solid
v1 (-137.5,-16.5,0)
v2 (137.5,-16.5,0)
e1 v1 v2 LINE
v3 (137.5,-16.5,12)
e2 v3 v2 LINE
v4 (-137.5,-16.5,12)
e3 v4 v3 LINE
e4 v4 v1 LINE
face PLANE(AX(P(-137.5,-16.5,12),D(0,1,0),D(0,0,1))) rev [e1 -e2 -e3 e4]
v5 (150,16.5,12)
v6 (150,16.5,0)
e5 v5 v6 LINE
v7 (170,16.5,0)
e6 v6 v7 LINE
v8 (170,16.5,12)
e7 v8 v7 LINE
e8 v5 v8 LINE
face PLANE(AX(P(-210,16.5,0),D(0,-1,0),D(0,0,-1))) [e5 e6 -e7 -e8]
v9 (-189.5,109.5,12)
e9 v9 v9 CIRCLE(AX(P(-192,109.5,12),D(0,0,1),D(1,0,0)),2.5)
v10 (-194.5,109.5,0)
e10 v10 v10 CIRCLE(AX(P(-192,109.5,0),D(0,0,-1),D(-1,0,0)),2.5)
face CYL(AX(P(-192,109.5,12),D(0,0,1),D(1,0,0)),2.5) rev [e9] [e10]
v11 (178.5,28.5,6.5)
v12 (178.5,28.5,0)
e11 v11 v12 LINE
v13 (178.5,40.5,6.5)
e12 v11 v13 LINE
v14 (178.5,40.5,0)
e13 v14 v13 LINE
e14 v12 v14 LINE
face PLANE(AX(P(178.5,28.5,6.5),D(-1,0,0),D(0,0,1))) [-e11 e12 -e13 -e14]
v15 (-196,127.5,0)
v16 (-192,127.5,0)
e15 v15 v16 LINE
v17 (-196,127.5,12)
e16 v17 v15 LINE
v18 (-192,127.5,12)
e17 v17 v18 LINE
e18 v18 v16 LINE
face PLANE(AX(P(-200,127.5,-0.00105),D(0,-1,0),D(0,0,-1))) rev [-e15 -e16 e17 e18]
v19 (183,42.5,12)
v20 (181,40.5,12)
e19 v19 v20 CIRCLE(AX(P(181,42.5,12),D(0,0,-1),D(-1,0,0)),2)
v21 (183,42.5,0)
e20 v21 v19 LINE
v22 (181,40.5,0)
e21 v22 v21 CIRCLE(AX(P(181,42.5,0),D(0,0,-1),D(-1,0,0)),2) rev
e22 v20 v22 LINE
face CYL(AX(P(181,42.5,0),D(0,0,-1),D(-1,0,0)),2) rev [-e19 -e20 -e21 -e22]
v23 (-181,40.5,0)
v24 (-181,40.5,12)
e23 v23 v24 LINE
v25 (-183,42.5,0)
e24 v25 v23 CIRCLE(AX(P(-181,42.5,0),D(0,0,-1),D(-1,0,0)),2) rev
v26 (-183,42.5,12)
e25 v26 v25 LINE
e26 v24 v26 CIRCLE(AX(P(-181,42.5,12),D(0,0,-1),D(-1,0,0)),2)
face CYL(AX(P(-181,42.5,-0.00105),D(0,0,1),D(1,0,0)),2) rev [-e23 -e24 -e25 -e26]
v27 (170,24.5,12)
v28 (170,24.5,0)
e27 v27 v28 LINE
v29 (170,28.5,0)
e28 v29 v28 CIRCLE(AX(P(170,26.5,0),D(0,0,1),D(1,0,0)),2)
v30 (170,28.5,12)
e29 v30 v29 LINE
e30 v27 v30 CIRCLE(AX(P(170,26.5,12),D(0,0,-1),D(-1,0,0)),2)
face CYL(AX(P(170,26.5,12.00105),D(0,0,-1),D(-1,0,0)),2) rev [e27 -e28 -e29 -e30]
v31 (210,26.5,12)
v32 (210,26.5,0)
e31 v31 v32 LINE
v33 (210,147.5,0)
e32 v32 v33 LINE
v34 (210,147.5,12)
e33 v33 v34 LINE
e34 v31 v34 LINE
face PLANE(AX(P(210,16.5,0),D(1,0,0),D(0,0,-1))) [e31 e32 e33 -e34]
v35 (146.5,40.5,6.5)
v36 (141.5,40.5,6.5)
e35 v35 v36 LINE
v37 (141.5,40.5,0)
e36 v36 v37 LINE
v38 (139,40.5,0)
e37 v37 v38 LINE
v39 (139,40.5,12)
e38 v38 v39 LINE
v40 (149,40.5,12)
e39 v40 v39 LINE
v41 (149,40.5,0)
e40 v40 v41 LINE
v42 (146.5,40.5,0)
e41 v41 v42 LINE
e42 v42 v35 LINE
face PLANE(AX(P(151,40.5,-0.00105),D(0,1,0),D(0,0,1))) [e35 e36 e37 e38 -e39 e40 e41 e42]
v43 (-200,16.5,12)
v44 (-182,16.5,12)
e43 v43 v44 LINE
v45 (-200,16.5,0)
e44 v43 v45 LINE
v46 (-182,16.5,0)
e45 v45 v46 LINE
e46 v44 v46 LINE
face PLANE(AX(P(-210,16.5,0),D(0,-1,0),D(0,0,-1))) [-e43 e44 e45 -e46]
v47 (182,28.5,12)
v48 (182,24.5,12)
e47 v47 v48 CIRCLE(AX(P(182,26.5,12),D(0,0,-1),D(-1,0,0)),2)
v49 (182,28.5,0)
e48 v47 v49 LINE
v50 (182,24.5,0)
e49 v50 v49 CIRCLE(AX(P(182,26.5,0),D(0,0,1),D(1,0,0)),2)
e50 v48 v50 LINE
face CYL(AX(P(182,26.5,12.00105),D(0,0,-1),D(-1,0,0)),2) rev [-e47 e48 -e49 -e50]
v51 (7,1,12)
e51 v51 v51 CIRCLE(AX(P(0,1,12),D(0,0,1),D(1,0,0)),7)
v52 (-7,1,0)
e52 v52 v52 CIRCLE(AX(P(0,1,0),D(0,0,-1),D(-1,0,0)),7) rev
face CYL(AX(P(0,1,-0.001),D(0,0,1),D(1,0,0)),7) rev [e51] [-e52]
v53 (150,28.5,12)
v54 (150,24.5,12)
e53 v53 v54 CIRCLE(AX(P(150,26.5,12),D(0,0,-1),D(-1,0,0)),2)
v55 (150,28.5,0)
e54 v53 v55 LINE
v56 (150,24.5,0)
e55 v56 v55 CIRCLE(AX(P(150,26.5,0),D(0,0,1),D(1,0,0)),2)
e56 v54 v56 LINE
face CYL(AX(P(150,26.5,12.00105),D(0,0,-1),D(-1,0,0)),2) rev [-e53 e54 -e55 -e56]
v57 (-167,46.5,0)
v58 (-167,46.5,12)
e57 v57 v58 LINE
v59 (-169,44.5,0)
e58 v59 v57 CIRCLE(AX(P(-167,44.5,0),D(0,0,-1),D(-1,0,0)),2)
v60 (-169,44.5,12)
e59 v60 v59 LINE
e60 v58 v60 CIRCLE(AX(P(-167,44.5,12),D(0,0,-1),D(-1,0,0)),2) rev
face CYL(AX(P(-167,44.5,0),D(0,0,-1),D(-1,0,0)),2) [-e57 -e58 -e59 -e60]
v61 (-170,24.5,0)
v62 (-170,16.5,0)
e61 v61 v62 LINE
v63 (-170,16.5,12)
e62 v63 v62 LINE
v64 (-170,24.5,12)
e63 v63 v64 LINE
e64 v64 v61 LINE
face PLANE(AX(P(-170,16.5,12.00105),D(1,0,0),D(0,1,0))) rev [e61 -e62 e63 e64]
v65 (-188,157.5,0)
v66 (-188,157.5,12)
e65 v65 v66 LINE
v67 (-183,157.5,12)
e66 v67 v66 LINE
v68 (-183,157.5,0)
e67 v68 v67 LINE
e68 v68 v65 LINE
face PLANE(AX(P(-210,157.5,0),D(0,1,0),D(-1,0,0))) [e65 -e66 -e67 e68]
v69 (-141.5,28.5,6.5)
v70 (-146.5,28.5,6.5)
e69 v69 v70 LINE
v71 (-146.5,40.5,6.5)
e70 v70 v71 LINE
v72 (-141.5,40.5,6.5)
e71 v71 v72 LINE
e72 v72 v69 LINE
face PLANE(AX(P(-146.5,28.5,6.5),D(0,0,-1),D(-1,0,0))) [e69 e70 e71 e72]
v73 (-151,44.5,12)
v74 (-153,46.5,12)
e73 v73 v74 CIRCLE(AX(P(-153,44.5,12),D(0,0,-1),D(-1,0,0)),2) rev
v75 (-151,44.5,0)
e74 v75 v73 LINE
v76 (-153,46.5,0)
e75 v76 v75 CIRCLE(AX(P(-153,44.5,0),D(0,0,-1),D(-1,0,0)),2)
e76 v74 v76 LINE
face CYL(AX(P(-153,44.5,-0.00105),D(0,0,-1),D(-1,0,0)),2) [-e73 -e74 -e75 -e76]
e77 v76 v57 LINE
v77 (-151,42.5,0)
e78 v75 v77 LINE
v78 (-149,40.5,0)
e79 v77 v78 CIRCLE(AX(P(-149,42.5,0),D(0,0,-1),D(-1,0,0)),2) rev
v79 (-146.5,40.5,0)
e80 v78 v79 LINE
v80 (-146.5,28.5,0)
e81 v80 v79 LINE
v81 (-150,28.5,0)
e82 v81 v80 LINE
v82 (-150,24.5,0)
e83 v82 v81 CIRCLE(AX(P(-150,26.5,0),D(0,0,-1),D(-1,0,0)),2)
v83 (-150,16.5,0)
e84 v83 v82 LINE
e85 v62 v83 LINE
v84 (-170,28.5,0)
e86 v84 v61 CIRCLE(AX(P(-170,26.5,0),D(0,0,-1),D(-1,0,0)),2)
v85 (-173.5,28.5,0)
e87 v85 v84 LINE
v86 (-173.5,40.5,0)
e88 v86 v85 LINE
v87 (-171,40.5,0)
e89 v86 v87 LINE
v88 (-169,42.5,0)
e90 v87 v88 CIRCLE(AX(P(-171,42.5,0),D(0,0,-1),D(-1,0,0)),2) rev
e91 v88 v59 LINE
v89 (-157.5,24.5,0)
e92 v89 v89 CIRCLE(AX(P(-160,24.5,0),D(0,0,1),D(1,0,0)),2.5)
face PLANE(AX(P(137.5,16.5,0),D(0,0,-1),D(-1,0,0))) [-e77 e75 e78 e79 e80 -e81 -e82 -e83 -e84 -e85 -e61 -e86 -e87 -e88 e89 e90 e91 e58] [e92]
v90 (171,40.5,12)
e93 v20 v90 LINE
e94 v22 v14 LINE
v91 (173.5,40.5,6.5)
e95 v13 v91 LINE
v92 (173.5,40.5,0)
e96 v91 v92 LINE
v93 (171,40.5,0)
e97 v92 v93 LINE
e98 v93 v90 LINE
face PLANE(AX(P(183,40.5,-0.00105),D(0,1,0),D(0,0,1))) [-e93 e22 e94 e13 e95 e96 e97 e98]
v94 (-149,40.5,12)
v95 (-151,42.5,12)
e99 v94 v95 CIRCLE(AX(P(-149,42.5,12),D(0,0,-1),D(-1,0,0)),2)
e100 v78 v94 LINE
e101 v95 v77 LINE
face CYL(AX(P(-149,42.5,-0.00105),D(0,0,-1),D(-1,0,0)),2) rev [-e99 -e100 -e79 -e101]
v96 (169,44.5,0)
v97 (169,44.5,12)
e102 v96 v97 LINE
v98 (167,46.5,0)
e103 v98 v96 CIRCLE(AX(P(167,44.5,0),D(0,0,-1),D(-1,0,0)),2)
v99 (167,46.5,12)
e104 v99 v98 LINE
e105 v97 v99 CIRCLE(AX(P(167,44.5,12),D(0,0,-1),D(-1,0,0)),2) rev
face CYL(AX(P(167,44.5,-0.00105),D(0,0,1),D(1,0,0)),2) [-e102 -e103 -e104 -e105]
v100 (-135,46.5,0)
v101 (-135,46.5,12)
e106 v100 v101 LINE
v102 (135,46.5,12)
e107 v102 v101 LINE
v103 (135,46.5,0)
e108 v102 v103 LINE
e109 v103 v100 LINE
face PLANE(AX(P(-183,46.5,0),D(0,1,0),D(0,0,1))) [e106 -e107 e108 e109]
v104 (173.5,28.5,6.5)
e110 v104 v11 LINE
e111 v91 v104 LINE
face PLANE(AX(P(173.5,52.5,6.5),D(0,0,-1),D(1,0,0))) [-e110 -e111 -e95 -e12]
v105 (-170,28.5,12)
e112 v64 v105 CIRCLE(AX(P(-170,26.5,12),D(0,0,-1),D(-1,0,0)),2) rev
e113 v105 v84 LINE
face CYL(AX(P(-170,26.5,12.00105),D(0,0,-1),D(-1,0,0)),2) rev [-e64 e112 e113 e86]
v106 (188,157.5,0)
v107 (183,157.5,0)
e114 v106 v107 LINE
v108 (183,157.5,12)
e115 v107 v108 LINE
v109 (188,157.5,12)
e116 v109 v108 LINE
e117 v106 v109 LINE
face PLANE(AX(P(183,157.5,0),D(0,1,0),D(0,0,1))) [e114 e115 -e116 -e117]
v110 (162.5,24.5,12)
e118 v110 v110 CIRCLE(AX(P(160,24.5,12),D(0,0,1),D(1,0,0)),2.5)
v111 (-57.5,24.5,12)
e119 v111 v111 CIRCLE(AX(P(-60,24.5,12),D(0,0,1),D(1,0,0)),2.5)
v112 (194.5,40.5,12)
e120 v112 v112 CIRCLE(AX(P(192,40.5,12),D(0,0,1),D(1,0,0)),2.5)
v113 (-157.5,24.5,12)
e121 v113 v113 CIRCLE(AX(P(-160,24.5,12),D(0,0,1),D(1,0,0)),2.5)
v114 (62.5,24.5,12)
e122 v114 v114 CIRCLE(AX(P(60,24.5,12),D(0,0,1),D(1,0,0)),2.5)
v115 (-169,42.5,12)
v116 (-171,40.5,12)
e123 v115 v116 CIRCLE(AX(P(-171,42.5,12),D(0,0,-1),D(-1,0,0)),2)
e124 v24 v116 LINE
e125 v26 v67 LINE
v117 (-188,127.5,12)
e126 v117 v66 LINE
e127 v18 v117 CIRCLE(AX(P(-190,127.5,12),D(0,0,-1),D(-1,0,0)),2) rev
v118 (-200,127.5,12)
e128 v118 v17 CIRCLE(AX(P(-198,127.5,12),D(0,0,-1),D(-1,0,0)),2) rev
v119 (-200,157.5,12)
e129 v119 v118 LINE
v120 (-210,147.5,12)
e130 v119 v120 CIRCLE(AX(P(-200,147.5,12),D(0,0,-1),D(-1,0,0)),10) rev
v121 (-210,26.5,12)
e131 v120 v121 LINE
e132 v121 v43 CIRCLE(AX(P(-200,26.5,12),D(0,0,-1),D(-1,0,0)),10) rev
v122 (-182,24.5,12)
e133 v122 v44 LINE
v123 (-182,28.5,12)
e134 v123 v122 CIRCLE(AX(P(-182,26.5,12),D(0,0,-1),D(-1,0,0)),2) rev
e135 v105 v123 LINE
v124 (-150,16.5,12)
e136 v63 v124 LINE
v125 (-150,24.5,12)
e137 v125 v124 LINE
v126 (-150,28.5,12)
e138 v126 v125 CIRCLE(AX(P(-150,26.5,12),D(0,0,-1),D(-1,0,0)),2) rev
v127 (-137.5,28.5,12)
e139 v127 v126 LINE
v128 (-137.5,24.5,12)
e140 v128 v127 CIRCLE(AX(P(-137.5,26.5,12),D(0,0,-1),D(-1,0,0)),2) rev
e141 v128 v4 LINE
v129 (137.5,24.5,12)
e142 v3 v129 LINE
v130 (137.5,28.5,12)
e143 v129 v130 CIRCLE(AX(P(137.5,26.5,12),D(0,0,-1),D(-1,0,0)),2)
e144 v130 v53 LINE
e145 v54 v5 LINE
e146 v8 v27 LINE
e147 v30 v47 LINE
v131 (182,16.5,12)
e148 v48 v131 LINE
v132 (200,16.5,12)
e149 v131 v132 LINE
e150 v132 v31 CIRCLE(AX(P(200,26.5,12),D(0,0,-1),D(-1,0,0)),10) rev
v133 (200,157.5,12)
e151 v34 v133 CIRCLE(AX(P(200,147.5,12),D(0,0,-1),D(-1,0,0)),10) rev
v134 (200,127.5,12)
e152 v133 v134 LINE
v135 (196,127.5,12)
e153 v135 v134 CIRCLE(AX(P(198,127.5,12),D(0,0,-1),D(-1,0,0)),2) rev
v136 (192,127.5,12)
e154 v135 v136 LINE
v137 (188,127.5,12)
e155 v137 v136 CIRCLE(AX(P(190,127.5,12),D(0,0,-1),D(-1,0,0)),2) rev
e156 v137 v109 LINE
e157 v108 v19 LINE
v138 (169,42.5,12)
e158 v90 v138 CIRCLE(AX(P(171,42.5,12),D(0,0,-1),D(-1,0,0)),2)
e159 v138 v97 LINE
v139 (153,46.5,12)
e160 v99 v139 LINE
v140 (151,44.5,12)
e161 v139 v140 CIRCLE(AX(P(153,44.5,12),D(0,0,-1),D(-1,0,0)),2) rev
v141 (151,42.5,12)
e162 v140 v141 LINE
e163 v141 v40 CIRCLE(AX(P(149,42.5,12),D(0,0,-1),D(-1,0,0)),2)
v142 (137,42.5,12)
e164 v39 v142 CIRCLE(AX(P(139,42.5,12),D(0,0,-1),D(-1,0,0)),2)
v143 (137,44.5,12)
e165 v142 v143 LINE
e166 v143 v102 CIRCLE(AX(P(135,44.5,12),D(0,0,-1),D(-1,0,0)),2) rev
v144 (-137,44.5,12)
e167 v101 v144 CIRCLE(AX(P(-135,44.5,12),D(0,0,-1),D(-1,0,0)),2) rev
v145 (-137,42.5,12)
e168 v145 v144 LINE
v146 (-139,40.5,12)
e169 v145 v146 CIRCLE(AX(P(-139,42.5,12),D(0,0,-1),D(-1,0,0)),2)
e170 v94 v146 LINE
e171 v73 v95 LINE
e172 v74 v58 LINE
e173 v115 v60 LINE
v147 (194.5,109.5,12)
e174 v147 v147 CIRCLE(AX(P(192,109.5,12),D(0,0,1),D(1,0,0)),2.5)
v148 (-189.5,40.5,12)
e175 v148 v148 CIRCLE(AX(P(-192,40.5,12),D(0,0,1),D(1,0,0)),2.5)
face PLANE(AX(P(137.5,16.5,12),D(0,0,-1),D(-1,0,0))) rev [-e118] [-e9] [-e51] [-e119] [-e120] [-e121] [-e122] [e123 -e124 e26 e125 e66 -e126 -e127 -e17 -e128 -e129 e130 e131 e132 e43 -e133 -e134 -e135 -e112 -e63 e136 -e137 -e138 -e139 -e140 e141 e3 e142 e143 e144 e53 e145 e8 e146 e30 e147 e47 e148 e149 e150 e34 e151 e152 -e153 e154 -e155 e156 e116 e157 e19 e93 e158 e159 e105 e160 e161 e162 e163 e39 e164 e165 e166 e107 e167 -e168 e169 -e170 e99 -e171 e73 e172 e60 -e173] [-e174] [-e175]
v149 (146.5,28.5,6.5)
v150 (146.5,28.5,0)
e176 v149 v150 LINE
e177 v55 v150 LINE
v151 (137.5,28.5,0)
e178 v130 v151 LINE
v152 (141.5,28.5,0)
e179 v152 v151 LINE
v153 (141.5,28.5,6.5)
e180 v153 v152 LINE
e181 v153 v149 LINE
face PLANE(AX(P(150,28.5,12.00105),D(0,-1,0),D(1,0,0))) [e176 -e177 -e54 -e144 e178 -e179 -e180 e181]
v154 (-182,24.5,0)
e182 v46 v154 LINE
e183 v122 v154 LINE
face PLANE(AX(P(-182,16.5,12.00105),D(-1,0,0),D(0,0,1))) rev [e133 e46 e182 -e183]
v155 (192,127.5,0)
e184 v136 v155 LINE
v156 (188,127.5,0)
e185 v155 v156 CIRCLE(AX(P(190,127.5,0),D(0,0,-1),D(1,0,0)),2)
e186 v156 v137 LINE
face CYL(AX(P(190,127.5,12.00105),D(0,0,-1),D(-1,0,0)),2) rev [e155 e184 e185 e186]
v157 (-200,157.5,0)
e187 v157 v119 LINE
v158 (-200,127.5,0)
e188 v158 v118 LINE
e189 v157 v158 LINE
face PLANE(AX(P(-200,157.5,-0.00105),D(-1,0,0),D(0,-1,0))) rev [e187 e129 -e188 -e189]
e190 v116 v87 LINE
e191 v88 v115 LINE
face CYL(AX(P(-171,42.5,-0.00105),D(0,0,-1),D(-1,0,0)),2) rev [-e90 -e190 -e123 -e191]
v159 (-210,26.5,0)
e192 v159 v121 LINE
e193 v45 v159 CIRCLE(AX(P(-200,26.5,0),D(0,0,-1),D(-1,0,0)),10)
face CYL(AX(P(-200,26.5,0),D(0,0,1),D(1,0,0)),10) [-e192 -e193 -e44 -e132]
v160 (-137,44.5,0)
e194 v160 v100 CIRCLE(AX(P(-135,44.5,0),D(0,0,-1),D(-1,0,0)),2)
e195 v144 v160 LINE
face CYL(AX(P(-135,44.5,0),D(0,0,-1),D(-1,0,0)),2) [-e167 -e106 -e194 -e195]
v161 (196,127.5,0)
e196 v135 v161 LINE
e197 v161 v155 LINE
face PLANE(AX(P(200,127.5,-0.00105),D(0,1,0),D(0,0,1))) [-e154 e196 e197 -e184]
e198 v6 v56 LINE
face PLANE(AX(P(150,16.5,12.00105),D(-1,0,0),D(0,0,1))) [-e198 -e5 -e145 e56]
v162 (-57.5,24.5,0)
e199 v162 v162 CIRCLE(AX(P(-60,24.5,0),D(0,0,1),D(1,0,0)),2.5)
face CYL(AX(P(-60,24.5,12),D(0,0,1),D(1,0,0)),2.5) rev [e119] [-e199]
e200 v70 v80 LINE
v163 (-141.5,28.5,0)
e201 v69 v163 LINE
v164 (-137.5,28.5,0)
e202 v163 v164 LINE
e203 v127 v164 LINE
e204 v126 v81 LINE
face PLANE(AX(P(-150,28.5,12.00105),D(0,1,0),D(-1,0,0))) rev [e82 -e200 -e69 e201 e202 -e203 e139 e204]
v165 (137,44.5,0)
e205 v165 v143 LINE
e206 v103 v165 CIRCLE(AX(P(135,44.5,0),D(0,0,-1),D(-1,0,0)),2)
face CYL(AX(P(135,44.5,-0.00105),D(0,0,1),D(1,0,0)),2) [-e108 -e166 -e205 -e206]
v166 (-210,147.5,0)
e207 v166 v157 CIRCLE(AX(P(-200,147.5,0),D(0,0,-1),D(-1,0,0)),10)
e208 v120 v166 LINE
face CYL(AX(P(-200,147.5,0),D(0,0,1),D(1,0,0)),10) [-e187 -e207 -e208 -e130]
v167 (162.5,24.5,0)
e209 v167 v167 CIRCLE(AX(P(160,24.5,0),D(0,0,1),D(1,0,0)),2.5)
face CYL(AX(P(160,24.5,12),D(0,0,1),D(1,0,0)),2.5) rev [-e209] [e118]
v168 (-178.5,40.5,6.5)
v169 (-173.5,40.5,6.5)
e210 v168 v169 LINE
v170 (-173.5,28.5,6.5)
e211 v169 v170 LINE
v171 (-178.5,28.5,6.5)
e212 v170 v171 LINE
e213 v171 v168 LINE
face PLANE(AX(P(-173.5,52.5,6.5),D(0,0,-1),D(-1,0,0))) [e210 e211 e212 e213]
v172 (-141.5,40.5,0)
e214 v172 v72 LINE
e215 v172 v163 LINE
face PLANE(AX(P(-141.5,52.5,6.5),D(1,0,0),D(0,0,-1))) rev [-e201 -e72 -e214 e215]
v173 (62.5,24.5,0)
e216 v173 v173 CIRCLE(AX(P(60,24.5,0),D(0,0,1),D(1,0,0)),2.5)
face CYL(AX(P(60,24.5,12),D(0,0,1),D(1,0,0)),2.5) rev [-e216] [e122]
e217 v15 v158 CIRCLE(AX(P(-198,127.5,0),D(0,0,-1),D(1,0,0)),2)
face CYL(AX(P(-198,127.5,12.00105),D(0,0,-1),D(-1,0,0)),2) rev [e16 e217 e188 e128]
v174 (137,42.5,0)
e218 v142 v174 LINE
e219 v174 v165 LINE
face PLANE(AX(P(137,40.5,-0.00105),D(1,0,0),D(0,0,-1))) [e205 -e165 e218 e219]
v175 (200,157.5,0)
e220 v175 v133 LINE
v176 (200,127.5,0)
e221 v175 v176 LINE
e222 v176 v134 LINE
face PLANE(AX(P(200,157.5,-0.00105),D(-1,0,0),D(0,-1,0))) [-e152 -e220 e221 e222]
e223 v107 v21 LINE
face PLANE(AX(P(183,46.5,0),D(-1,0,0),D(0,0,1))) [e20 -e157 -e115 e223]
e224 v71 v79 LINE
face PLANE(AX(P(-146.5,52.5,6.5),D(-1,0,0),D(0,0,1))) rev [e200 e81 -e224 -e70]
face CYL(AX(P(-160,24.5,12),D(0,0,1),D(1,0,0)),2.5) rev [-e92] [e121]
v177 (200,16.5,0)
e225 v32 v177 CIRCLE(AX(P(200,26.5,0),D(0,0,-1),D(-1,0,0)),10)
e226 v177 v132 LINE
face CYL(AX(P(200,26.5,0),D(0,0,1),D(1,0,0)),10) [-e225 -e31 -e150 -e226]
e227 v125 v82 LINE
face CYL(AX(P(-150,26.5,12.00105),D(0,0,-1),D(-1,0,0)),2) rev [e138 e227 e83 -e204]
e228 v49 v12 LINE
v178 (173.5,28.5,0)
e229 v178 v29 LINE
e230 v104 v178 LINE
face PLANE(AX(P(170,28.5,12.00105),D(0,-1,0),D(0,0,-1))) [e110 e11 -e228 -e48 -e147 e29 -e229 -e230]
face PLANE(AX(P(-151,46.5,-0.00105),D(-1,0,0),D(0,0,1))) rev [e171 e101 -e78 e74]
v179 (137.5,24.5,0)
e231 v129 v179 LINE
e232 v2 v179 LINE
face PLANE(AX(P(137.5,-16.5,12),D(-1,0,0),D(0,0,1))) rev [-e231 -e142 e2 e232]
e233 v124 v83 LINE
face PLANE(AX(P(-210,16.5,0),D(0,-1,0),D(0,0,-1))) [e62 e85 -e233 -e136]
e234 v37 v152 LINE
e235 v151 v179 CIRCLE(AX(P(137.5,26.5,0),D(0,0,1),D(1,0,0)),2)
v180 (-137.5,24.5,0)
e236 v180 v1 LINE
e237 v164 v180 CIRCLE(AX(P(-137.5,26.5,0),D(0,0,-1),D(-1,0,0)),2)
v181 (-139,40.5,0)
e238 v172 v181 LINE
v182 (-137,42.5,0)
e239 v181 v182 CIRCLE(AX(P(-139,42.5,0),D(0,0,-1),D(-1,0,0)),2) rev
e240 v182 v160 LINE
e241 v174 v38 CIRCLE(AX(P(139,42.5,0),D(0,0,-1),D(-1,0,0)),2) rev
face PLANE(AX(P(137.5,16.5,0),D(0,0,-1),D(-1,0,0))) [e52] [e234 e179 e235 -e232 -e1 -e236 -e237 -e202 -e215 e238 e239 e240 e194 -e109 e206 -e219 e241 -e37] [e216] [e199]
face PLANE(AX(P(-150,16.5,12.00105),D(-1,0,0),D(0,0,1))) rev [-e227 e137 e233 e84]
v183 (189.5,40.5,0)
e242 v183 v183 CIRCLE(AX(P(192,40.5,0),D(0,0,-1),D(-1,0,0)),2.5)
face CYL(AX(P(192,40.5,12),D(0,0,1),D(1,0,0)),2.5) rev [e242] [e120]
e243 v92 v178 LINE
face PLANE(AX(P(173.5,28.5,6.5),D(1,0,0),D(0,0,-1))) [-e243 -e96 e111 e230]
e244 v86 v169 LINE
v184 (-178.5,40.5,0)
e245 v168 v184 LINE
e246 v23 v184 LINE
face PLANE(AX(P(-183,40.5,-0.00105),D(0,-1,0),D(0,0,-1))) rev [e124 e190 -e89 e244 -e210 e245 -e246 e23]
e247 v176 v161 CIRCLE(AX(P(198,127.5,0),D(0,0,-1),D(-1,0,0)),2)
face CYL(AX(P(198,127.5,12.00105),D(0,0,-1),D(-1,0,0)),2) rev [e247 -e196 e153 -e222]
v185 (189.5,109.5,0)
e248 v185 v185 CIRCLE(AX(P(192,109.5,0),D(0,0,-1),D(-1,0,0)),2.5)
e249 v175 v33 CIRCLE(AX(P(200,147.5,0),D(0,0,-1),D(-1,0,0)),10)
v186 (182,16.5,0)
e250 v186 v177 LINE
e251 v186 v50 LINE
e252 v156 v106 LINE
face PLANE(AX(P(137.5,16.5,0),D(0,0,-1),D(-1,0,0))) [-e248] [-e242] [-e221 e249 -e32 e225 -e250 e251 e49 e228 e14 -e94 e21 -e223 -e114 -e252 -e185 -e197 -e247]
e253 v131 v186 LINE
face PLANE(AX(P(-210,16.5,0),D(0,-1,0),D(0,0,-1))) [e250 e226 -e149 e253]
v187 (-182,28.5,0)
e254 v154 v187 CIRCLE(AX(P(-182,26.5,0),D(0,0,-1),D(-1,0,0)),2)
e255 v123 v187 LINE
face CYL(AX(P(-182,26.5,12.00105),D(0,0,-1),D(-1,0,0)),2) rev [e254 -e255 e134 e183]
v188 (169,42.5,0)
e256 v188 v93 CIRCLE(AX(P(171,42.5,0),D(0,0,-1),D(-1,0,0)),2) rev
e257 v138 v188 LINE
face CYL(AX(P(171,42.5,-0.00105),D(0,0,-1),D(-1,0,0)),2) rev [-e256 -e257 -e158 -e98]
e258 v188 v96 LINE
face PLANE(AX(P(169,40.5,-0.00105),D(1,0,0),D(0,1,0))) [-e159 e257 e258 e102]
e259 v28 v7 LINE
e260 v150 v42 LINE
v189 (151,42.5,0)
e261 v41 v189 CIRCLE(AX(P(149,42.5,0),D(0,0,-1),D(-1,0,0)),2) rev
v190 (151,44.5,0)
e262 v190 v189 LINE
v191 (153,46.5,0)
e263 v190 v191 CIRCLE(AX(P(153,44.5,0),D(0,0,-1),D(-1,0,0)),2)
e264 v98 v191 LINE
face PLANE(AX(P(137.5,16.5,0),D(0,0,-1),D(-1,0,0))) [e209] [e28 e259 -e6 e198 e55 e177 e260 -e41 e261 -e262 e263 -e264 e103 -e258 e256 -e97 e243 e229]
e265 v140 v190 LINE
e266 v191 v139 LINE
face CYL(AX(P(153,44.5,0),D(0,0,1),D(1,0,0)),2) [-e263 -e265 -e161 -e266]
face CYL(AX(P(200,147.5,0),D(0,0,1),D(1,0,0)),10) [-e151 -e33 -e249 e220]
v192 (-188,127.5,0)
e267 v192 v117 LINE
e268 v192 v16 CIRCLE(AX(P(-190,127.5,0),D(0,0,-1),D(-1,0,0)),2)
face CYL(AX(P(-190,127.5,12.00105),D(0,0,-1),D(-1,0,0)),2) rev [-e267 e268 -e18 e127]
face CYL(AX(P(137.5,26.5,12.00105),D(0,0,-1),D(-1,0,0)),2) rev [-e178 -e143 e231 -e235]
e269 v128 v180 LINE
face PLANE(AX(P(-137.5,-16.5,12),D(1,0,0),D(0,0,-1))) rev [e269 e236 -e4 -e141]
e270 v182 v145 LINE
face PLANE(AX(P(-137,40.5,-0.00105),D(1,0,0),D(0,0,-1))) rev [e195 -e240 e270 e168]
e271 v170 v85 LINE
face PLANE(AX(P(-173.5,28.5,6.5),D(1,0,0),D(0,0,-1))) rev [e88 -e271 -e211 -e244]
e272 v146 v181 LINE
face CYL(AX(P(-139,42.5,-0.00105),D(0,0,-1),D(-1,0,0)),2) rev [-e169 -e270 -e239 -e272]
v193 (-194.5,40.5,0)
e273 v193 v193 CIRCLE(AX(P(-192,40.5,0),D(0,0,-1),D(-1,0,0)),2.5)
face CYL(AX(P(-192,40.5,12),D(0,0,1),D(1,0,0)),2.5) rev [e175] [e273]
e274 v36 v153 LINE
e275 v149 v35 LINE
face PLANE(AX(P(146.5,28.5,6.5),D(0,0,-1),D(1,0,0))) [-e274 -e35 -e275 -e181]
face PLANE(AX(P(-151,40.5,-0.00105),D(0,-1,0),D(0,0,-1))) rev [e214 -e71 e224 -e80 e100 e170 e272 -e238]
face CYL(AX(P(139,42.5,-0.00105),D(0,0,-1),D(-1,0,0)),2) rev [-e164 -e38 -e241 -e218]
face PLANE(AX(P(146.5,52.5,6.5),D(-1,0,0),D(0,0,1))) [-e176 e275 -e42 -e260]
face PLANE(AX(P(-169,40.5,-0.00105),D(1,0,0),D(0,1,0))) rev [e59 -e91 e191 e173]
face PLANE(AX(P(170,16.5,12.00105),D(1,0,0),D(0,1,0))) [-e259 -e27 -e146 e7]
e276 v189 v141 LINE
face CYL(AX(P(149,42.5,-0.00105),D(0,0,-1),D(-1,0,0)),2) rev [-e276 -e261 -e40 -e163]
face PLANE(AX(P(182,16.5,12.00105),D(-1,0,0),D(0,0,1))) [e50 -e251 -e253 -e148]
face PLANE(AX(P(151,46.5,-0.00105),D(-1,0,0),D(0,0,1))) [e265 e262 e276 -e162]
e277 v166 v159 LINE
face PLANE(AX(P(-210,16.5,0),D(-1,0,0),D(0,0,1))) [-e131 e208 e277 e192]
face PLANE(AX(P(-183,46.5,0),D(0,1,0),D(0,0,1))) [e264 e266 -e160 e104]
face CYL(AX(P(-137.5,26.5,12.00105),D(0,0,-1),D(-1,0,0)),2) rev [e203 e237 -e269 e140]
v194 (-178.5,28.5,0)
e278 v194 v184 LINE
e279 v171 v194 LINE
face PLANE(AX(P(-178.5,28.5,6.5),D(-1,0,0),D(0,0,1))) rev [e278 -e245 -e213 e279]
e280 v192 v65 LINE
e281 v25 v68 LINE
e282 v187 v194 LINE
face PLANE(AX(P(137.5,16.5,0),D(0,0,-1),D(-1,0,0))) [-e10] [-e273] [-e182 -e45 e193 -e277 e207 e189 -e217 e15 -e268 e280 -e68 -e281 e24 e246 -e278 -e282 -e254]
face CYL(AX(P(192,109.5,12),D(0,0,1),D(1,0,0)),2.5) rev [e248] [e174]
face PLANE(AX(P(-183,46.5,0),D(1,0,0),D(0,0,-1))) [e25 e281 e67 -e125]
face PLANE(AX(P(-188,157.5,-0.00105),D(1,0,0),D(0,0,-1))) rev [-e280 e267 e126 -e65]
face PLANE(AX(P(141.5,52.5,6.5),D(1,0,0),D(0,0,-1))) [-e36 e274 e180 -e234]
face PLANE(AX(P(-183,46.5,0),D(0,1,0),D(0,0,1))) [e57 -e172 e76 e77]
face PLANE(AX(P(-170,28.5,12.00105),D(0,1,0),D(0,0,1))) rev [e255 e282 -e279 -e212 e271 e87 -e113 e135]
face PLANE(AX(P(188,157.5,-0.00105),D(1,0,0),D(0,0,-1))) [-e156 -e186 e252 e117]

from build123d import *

# Parameters (mm, degrees)
SKETCH1_W                    = 275
SKETCH1_H                    = 33
BOSS_EXTRUDE1_DEPTH          = 12
CUT_EXTRUDE1_REACH           = 141.005
SKETCH2_R                    = 7
BOSS_EXTRUDE2_DEPTH          = 12
CUT_EXTRUDE3_REACH           = 264.774
SKETCH5_W                    = 14
SKETCH5_H                    = 6
FILLET1_R                    = 2
SKETCH17_W                   = 5
SKETCH17_H                   = 24
CUT_EXTRUDE9_DEPTH           = 6.5
CUT_EXTRUDE4_REACH           = 264.774
SKETCH6_W                    = 12
SKETCH6_H                    = 30
F_5_0_5_DIAMETER_HOLE2_D     = 5
F_5_0_5_DIAMETER_HOLE1_D     = 5
F_5_0_5_DIAMETER_HOLE1_DEPTH = 12
F_5_0_5_DIAMETER_HOLE1_TIP   = 1.502151548
FILLET2_R                    = 10
CUT_EXTRUDE5_REACH           = 264.774
CUT_EXTRUDE10_REACH          = 264.774
FILLET1_OF_MIRROR2_R         = 2


with BuildPart() as part:
    # Sketch1 → Boss-Extrude1 (new body)
    with BuildSketch(Plane.XY):
        Rectangle(SKETCH1_W, SKETCH1_H)
    extrude(amount=BOSS_EXTRUDE1_DEPTH)

    # Sketch2 → Cut-Extrude1 (cut, up to next)
    with BuildSketch(Plane.XY.offset(12), mode=Mode.PRIVATE) as cut_extrude1_sk1:
        with Locations((0, 1)):
            Circle(SKETCH2_R)
    cut_extrude1_tool1 = extrude(cut_extrude1_sk1.sketch, amount=-CUT_EXTRUDE1_REACH, mode=Mode.PRIVATE) & part.part
    add(cut_extrude1_tool1.solids().sort_by_distance((0, 1, 12))[0], mode=Mode.SUBTRACT)

    # Sketch3 → Boss-Extrude2 (add)
    with BuildSketch(Plane.XY.offset(12)):
        Polygon((-210, 16.5), (210, 16.5), (210, 157.5), (183, 157.5), (183, 46.5), (-183, 46.5), (-183, 157.5), (-210, 157.5), align=None)
    extrude(amount=-BOSS_EXTRUDE2_DEPTH)

    # Sketch5 → Cut-Extrude3 (cut, up to next)
    with BuildSketch(Plane.XY.offset(12), mode=Mode.PRIVATE) as cut_extrude3_sk1:
        with Locations((-176, 43.5)):
            Rectangle(SKETCH5_W, SKETCH5_H)
    cut_extrude3_tool1 = extrude(cut_extrude3_sk1.sketch, amount=-CUT_EXTRUDE3_REACH, mode=Mode.PRIVATE) & part.part
    # Sketch5 → Cut-Extrude3 (cut, up to next)
    with BuildSketch(Plane.XY.offset(12), mode=Mode.PRIVATE) as cut_extrude3_sk2:
        with Locations((-144, 43.5)):
            Rectangle(SKETCH5_W, SKETCH5_H)
    cut_extrude3_tool2 = extrude(cut_extrude3_sk2.sketch, amount=-CUT_EXTRUDE3_REACH, mode=Mode.PRIVATE) & part.part
    cut_extrude3_1 = cut_extrude3_tool1.solids().sort_by_distance((-176, 43.5, 12))[0]
    add(cut_extrude3_1, mode=Mode.SUBTRACT)
    cut_extrude3_2 = cut_extrude3_tool2.solids().sort_by_distance((-144, 43.5, 12))[0]
    add(cut_extrude3_2, mode=Mode.SUBTRACT)
    cut_extrude3 = cut_extrude3_1 + cut_extrude3_2  # Cut-Extrude3 as one shape, for the pattern or mirror that repeats it

    # Fillet1
    fillet1_edges = [part.edges().sort_by_distance(p)[0] for p in [
        (-169, 46.5, 6),
        (-169, 40.5, 6),
        (-183, 40.5, 6),
        (-151, 46.5, 6),
        (-137, 46.5, 6),
        (-137, 40.5, 6),
        (-151, 40.5, 6),
    ]]
    fillet(fillet1_edges, radius=FILLET1_R)

    # Sketch17 → Cut-Extrude9 (cut)
    with BuildSketch(Plane(origin=(0, 0, 0), x_dir=(-1, 0, 0), z_dir=(0, 0, -1))):
        with Locations((144, 40.5)):
            Rectangle(SKETCH17_W, SKETCH17_H)
        with Locations((176, 40.5)):
            Rectangle(SKETCH17_W, SKETCH17_H)
    cut_extrude9 = extrude(amount=-CUT_EXTRUDE9_DEPTH, mode=Mode.SUBTRACT)

    # Sketch6 → Cut-Extrude4 (cut, up to next)
    with BuildSketch(Plane.XY.offset(12), mode=Mode.PRIVATE) as cut_extrude4_sk1:
        with Locations((-194, 142.5)):
            Rectangle(SKETCH6_W, SKETCH6_H)
    cut_extrude4_tool1 = extrude(cut_extrude4_sk1.sketch, amount=-CUT_EXTRUDE4_REACH, mode=Mode.PRIVATE) & part.part
    cut_extrude4 = cut_extrude4_tool1.solids().sort_by_distance((-194, 142.5, 12))[0]
    add(cut_extrude4, mode=Mode.SUBTRACT)

    # Mirror3: Cut-Extrude4 across plane
    add(cut_extrude4.mirror(Plane(origin=(0, 0, 0), x_dir=(0, 0, 1), z_dir=(1, 0, 0))), mode=Mode.SUBTRACT)

    # Ø5.0 (5) Diameter Hole2 (through all)
    with Locations(Plane.XY.offset(12)):
        with Locations((-192, 40.5), (-192, 109.5)):
            f_5_0_5_diameter_hole2 = Hole(F_5_0_5_DIAMETER_HOLE2_D / 2)

    # Mirror4: Ø5.0 (5) Diameter Hole2 across plane
    add(f_5_0_5_diameter_hole2.mirror(Plane(origin=(0, 0, 0), x_dir=(0, 0, 1), z_dir=(1, 0, 0))), mode=Mode.SUBTRACT)

    # Ø5.0 (5) Diameter Hole1
    with Locations(Plane.XY.offset(12)):
        with Locations((-60, 24.5), (60, 24.5), (-160, 24.5), (160, 24.5)):
            Hole(F_5_0_5_DIAMETER_HOLE1_D / 2, depth=F_5_0_5_DIAMETER_HOLE1_DEPTH)
            with Locations((0, 0, -(F_5_0_5_DIAMETER_HOLE1_DEPTH + F_5_0_5_DIAMETER_HOLE1_TIP / 2))):  # 118° drill point
                Cone(0, F_5_0_5_DIAMETER_HOLE1_D / 2, F_5_0_5_DIAMETER_HOLE1_TIP, mode=Mode.SUBTRACT)

    # Fillet2
    fillet2_edges = [part.edges().sort_by_distance(p)[0] for p in [
        (210, 157.5, 6),
        (210, 16.5, 6),
        (-210, 16.5, 6),
        (-210, 157.5, 6),
    ]]
    fillet(fillet2_edges, radius=FILLET2_R - 0.0001)  # a hair under: the kernel refuses the full size

    # Sketch11 → Cut-Extrude5 (cut, up to next)
    with BuildSketch(Plane(origin=(0, 0, 0), x_dir=(-1, 0, 0), z_dir=(0, 0, -1)), mode=Mode.PRIVATE) as cut_extrude5_sk1:
        with BuildLine():
            Line((-200, 127.5), (-196, 127.5))
            ThreePointArc((-196, 127.5), (-198, 125.5), (-200, 127.5))
        make_face()
    cut_extrude5_tool1 = extrude(cut_extrude5_sk1.sketch, amount=-CUT_EXTRUDE5_REACH, mode=Mode.PRIVATE) & part.part
    # Sketch11 → Cut-Extrude5 (cut, up to next)
    with BuildSketch(Plane(origin=(0, 0, 0), x_dir=(-1, 0, 0), z_dir=(0, 0, -1)), mode=Mode.PRIVATE) as cut_extrude5_sk2:
        with BuildLine():
            Line((-192, 127.5), (-188, 127.5))
            ThreePointArc((-188, 127.5), (-190, 125.5), (-192, 127.5))
        make_face()
    cut_extrude5_tool2 = extrude(cut_extrude5_sk2.sketch, amount=-CUT_EXTRUDE5_REACH, mode=Mode.PRIVATE) & part.part
    # Sketch11 → Cut-Extrude5 (cut, up to next)
    with BuildSketch(Plane(origin=(0, 0, 0), x_dir=(-1, 0, 0), z_dir=(0, 0, -1)), mode=Mode.PRIVATE) as cut_extrude5_sk3:
        with BuildLine():
            Line((188, 127.5), (192, 127.5))
            ThreePointArc((192, 127.5), (190, 125.5), (188, 127.5))
        make_face()
    cut_extrude5_tool3 = extrude(cut_extrude5_sk3.sketch, amount=-CUT_EXTRUDE5_REACH, mode=Mode.PRIVATE) & part.part
    # Sketch11 → Cut-Extrude5 (cut, up to next)
    with BuildSketch(Plane(origin=(0, 0, 0), x_dir=(-1, 0, 0), z_dir=(0, 0, -1)), mode=Mode.PRIVATE) as cut_extrude5_sk4:
        with BuildLine():
            Line((196, 127.5), (200, 127.5))
            ThreePointArc((200, 127.5), (198, 125.5), (196, 127.5))
        make_face()
    cut_extrude5_tool4 = extrude(cut_extrude5_sk4.sketch, amount=-CUT_EXTRUDE5_REACH, mode=Mode.PRIVATE) & part.part
    add(cut_extrude5_tool1.solids().sort_by_distance((198, 126.651174, 0))[0], mode=Mode.SUBTRACT)
    add(cut_extrude5_tool2.solids().sort_by_distance((190, 126.651174, 0))[0], mode=Mode.SUBTRACT)
    add(cut_extrude5_tool3.solids().sort_by_distance((-190, 126.651174, 0))[0], mode=Mode.SUBTRACT)
    add(cut_extrude5_tool4.solids().sort_by_distance((-198, 126.651174, 0))[0], mode=Mode.SUBTRACT)

    # Sketch18 → Cut-Extrude10 (cut, up to next)
    with BuildSketch(Plane(origin=(0, 0, 0), x_dir=(-1, 0, 0), z_dir=(0, 0, -1)), mode=Mode.PRIVATE) as cut_extrude10_sk1:
        with BuildLine():
            Line((150, 16.5), (137.5, 16.5))
            Line((137.5, 16.5), (137.5, 24.5))
            ThreePointArc((137.5, 24.5), (135.5, 26.5), (137.5, 28.5))
            Line((137.5, 28.5), (150, 28.5))
            ThreePointArc((150, 28.5), (152, 26.5), (150, 24.5))
            Line((150, 24.5), (150, 16.5))
        make_face()
    cut_extrude10_tool1 = extrude(cut_extrude10_sk1.sketch, amount=-CUT_EXTRUDE10_REACH, mode=Mode.PRIVATE) & part.part
    # Sketch18 → Cut-Extrude10 (cut, up to next)
    with BuildSketch(Plane(origin=(0, 0, 0), x_dir=(-1, 0, 0), z_dir=(0, 0, -1)), mode=Mode.PRIVATE) as cut_extrude10_sk2:
        with BuildLine():
            Line((170, 16.5), (182, 16.5))
            Line((182, 16.5), (182, 24.5))
            ThreePointArc((182, 24.5), (184, 26.5), (182, 28.5))
            Line((182, 28.5), (170, 28.5))
            ThreePointArc((170, 28.5), (168, 26.5), (170, 24.5))
            Line((170, 24.5), (170, 16.5))
        make_face()
    cut_extrude10_tool2 = extrude(cut_extrude10_sk2.sketch, amount=-CUT_EXTRUDE10_REACH, mode=Mode.PRIVATE) & part.part
    cut_extrude10_1 = cut_extrude10_tool1.solids().sort_by_distance((-143.75, 22.8092, 0))[0]
    add(cut_extrude10_1, mode=Mode.SUBTRACT)
    cut_extrude10_2 = cut_extrude10_tool2.solids().sort_by_distance((-176, 22.821049, 0))[0]
    add(cut_extrude10_2, mode=Mode.SUBTRACT)
    cut_extrude10 = cut_extrude10_1 + cut_extrude10_2  # Cut-Extrude10 as one shape, for the pattern or mirror that repeats it

    # Mirror2: Cut-Extrude3, Cut-Extrude9, Cut-Extrude10 across plane
    add(cut_extrude3.mirror(Plane(origin=(0, 0, 0), x_dir=(0, 0, 1), z_dir=(1, 0, 0))), mode=Mode.SUBTRACT)
    add(cut_extrude9.mirror(Plane(origin=(0, 0, 0), x_dir=(0, 0, 1), z_dir=(1, 0, 0))), mode=Mode.SUBTRACT)
    add(cut_extrude10.mirror(Plane(origin=(0, 0, 0), x_dir=(0, 0, 1), z_dir=(1, 0, 0))), mode=Mode.SUBTRACT)

    # Fillet1 of Mirror2
    fillet1_of_mirror2_edges = [part.edges().sort_by_distance(p)[0] for p in [
        (169, 46.5, 6),
        (169, 40.5, 6),
        (183, 40.5, 6),
        (151, 46.5, 6),
        (137, 46.5, 6),
        (137, 40.5, 6),
        (151, 40.5, 6),
    ]]
    fillet(fillet1_of_mirror2_edges, radius=FILLET1_OF_MIRROR2_R)


solid = part.part
